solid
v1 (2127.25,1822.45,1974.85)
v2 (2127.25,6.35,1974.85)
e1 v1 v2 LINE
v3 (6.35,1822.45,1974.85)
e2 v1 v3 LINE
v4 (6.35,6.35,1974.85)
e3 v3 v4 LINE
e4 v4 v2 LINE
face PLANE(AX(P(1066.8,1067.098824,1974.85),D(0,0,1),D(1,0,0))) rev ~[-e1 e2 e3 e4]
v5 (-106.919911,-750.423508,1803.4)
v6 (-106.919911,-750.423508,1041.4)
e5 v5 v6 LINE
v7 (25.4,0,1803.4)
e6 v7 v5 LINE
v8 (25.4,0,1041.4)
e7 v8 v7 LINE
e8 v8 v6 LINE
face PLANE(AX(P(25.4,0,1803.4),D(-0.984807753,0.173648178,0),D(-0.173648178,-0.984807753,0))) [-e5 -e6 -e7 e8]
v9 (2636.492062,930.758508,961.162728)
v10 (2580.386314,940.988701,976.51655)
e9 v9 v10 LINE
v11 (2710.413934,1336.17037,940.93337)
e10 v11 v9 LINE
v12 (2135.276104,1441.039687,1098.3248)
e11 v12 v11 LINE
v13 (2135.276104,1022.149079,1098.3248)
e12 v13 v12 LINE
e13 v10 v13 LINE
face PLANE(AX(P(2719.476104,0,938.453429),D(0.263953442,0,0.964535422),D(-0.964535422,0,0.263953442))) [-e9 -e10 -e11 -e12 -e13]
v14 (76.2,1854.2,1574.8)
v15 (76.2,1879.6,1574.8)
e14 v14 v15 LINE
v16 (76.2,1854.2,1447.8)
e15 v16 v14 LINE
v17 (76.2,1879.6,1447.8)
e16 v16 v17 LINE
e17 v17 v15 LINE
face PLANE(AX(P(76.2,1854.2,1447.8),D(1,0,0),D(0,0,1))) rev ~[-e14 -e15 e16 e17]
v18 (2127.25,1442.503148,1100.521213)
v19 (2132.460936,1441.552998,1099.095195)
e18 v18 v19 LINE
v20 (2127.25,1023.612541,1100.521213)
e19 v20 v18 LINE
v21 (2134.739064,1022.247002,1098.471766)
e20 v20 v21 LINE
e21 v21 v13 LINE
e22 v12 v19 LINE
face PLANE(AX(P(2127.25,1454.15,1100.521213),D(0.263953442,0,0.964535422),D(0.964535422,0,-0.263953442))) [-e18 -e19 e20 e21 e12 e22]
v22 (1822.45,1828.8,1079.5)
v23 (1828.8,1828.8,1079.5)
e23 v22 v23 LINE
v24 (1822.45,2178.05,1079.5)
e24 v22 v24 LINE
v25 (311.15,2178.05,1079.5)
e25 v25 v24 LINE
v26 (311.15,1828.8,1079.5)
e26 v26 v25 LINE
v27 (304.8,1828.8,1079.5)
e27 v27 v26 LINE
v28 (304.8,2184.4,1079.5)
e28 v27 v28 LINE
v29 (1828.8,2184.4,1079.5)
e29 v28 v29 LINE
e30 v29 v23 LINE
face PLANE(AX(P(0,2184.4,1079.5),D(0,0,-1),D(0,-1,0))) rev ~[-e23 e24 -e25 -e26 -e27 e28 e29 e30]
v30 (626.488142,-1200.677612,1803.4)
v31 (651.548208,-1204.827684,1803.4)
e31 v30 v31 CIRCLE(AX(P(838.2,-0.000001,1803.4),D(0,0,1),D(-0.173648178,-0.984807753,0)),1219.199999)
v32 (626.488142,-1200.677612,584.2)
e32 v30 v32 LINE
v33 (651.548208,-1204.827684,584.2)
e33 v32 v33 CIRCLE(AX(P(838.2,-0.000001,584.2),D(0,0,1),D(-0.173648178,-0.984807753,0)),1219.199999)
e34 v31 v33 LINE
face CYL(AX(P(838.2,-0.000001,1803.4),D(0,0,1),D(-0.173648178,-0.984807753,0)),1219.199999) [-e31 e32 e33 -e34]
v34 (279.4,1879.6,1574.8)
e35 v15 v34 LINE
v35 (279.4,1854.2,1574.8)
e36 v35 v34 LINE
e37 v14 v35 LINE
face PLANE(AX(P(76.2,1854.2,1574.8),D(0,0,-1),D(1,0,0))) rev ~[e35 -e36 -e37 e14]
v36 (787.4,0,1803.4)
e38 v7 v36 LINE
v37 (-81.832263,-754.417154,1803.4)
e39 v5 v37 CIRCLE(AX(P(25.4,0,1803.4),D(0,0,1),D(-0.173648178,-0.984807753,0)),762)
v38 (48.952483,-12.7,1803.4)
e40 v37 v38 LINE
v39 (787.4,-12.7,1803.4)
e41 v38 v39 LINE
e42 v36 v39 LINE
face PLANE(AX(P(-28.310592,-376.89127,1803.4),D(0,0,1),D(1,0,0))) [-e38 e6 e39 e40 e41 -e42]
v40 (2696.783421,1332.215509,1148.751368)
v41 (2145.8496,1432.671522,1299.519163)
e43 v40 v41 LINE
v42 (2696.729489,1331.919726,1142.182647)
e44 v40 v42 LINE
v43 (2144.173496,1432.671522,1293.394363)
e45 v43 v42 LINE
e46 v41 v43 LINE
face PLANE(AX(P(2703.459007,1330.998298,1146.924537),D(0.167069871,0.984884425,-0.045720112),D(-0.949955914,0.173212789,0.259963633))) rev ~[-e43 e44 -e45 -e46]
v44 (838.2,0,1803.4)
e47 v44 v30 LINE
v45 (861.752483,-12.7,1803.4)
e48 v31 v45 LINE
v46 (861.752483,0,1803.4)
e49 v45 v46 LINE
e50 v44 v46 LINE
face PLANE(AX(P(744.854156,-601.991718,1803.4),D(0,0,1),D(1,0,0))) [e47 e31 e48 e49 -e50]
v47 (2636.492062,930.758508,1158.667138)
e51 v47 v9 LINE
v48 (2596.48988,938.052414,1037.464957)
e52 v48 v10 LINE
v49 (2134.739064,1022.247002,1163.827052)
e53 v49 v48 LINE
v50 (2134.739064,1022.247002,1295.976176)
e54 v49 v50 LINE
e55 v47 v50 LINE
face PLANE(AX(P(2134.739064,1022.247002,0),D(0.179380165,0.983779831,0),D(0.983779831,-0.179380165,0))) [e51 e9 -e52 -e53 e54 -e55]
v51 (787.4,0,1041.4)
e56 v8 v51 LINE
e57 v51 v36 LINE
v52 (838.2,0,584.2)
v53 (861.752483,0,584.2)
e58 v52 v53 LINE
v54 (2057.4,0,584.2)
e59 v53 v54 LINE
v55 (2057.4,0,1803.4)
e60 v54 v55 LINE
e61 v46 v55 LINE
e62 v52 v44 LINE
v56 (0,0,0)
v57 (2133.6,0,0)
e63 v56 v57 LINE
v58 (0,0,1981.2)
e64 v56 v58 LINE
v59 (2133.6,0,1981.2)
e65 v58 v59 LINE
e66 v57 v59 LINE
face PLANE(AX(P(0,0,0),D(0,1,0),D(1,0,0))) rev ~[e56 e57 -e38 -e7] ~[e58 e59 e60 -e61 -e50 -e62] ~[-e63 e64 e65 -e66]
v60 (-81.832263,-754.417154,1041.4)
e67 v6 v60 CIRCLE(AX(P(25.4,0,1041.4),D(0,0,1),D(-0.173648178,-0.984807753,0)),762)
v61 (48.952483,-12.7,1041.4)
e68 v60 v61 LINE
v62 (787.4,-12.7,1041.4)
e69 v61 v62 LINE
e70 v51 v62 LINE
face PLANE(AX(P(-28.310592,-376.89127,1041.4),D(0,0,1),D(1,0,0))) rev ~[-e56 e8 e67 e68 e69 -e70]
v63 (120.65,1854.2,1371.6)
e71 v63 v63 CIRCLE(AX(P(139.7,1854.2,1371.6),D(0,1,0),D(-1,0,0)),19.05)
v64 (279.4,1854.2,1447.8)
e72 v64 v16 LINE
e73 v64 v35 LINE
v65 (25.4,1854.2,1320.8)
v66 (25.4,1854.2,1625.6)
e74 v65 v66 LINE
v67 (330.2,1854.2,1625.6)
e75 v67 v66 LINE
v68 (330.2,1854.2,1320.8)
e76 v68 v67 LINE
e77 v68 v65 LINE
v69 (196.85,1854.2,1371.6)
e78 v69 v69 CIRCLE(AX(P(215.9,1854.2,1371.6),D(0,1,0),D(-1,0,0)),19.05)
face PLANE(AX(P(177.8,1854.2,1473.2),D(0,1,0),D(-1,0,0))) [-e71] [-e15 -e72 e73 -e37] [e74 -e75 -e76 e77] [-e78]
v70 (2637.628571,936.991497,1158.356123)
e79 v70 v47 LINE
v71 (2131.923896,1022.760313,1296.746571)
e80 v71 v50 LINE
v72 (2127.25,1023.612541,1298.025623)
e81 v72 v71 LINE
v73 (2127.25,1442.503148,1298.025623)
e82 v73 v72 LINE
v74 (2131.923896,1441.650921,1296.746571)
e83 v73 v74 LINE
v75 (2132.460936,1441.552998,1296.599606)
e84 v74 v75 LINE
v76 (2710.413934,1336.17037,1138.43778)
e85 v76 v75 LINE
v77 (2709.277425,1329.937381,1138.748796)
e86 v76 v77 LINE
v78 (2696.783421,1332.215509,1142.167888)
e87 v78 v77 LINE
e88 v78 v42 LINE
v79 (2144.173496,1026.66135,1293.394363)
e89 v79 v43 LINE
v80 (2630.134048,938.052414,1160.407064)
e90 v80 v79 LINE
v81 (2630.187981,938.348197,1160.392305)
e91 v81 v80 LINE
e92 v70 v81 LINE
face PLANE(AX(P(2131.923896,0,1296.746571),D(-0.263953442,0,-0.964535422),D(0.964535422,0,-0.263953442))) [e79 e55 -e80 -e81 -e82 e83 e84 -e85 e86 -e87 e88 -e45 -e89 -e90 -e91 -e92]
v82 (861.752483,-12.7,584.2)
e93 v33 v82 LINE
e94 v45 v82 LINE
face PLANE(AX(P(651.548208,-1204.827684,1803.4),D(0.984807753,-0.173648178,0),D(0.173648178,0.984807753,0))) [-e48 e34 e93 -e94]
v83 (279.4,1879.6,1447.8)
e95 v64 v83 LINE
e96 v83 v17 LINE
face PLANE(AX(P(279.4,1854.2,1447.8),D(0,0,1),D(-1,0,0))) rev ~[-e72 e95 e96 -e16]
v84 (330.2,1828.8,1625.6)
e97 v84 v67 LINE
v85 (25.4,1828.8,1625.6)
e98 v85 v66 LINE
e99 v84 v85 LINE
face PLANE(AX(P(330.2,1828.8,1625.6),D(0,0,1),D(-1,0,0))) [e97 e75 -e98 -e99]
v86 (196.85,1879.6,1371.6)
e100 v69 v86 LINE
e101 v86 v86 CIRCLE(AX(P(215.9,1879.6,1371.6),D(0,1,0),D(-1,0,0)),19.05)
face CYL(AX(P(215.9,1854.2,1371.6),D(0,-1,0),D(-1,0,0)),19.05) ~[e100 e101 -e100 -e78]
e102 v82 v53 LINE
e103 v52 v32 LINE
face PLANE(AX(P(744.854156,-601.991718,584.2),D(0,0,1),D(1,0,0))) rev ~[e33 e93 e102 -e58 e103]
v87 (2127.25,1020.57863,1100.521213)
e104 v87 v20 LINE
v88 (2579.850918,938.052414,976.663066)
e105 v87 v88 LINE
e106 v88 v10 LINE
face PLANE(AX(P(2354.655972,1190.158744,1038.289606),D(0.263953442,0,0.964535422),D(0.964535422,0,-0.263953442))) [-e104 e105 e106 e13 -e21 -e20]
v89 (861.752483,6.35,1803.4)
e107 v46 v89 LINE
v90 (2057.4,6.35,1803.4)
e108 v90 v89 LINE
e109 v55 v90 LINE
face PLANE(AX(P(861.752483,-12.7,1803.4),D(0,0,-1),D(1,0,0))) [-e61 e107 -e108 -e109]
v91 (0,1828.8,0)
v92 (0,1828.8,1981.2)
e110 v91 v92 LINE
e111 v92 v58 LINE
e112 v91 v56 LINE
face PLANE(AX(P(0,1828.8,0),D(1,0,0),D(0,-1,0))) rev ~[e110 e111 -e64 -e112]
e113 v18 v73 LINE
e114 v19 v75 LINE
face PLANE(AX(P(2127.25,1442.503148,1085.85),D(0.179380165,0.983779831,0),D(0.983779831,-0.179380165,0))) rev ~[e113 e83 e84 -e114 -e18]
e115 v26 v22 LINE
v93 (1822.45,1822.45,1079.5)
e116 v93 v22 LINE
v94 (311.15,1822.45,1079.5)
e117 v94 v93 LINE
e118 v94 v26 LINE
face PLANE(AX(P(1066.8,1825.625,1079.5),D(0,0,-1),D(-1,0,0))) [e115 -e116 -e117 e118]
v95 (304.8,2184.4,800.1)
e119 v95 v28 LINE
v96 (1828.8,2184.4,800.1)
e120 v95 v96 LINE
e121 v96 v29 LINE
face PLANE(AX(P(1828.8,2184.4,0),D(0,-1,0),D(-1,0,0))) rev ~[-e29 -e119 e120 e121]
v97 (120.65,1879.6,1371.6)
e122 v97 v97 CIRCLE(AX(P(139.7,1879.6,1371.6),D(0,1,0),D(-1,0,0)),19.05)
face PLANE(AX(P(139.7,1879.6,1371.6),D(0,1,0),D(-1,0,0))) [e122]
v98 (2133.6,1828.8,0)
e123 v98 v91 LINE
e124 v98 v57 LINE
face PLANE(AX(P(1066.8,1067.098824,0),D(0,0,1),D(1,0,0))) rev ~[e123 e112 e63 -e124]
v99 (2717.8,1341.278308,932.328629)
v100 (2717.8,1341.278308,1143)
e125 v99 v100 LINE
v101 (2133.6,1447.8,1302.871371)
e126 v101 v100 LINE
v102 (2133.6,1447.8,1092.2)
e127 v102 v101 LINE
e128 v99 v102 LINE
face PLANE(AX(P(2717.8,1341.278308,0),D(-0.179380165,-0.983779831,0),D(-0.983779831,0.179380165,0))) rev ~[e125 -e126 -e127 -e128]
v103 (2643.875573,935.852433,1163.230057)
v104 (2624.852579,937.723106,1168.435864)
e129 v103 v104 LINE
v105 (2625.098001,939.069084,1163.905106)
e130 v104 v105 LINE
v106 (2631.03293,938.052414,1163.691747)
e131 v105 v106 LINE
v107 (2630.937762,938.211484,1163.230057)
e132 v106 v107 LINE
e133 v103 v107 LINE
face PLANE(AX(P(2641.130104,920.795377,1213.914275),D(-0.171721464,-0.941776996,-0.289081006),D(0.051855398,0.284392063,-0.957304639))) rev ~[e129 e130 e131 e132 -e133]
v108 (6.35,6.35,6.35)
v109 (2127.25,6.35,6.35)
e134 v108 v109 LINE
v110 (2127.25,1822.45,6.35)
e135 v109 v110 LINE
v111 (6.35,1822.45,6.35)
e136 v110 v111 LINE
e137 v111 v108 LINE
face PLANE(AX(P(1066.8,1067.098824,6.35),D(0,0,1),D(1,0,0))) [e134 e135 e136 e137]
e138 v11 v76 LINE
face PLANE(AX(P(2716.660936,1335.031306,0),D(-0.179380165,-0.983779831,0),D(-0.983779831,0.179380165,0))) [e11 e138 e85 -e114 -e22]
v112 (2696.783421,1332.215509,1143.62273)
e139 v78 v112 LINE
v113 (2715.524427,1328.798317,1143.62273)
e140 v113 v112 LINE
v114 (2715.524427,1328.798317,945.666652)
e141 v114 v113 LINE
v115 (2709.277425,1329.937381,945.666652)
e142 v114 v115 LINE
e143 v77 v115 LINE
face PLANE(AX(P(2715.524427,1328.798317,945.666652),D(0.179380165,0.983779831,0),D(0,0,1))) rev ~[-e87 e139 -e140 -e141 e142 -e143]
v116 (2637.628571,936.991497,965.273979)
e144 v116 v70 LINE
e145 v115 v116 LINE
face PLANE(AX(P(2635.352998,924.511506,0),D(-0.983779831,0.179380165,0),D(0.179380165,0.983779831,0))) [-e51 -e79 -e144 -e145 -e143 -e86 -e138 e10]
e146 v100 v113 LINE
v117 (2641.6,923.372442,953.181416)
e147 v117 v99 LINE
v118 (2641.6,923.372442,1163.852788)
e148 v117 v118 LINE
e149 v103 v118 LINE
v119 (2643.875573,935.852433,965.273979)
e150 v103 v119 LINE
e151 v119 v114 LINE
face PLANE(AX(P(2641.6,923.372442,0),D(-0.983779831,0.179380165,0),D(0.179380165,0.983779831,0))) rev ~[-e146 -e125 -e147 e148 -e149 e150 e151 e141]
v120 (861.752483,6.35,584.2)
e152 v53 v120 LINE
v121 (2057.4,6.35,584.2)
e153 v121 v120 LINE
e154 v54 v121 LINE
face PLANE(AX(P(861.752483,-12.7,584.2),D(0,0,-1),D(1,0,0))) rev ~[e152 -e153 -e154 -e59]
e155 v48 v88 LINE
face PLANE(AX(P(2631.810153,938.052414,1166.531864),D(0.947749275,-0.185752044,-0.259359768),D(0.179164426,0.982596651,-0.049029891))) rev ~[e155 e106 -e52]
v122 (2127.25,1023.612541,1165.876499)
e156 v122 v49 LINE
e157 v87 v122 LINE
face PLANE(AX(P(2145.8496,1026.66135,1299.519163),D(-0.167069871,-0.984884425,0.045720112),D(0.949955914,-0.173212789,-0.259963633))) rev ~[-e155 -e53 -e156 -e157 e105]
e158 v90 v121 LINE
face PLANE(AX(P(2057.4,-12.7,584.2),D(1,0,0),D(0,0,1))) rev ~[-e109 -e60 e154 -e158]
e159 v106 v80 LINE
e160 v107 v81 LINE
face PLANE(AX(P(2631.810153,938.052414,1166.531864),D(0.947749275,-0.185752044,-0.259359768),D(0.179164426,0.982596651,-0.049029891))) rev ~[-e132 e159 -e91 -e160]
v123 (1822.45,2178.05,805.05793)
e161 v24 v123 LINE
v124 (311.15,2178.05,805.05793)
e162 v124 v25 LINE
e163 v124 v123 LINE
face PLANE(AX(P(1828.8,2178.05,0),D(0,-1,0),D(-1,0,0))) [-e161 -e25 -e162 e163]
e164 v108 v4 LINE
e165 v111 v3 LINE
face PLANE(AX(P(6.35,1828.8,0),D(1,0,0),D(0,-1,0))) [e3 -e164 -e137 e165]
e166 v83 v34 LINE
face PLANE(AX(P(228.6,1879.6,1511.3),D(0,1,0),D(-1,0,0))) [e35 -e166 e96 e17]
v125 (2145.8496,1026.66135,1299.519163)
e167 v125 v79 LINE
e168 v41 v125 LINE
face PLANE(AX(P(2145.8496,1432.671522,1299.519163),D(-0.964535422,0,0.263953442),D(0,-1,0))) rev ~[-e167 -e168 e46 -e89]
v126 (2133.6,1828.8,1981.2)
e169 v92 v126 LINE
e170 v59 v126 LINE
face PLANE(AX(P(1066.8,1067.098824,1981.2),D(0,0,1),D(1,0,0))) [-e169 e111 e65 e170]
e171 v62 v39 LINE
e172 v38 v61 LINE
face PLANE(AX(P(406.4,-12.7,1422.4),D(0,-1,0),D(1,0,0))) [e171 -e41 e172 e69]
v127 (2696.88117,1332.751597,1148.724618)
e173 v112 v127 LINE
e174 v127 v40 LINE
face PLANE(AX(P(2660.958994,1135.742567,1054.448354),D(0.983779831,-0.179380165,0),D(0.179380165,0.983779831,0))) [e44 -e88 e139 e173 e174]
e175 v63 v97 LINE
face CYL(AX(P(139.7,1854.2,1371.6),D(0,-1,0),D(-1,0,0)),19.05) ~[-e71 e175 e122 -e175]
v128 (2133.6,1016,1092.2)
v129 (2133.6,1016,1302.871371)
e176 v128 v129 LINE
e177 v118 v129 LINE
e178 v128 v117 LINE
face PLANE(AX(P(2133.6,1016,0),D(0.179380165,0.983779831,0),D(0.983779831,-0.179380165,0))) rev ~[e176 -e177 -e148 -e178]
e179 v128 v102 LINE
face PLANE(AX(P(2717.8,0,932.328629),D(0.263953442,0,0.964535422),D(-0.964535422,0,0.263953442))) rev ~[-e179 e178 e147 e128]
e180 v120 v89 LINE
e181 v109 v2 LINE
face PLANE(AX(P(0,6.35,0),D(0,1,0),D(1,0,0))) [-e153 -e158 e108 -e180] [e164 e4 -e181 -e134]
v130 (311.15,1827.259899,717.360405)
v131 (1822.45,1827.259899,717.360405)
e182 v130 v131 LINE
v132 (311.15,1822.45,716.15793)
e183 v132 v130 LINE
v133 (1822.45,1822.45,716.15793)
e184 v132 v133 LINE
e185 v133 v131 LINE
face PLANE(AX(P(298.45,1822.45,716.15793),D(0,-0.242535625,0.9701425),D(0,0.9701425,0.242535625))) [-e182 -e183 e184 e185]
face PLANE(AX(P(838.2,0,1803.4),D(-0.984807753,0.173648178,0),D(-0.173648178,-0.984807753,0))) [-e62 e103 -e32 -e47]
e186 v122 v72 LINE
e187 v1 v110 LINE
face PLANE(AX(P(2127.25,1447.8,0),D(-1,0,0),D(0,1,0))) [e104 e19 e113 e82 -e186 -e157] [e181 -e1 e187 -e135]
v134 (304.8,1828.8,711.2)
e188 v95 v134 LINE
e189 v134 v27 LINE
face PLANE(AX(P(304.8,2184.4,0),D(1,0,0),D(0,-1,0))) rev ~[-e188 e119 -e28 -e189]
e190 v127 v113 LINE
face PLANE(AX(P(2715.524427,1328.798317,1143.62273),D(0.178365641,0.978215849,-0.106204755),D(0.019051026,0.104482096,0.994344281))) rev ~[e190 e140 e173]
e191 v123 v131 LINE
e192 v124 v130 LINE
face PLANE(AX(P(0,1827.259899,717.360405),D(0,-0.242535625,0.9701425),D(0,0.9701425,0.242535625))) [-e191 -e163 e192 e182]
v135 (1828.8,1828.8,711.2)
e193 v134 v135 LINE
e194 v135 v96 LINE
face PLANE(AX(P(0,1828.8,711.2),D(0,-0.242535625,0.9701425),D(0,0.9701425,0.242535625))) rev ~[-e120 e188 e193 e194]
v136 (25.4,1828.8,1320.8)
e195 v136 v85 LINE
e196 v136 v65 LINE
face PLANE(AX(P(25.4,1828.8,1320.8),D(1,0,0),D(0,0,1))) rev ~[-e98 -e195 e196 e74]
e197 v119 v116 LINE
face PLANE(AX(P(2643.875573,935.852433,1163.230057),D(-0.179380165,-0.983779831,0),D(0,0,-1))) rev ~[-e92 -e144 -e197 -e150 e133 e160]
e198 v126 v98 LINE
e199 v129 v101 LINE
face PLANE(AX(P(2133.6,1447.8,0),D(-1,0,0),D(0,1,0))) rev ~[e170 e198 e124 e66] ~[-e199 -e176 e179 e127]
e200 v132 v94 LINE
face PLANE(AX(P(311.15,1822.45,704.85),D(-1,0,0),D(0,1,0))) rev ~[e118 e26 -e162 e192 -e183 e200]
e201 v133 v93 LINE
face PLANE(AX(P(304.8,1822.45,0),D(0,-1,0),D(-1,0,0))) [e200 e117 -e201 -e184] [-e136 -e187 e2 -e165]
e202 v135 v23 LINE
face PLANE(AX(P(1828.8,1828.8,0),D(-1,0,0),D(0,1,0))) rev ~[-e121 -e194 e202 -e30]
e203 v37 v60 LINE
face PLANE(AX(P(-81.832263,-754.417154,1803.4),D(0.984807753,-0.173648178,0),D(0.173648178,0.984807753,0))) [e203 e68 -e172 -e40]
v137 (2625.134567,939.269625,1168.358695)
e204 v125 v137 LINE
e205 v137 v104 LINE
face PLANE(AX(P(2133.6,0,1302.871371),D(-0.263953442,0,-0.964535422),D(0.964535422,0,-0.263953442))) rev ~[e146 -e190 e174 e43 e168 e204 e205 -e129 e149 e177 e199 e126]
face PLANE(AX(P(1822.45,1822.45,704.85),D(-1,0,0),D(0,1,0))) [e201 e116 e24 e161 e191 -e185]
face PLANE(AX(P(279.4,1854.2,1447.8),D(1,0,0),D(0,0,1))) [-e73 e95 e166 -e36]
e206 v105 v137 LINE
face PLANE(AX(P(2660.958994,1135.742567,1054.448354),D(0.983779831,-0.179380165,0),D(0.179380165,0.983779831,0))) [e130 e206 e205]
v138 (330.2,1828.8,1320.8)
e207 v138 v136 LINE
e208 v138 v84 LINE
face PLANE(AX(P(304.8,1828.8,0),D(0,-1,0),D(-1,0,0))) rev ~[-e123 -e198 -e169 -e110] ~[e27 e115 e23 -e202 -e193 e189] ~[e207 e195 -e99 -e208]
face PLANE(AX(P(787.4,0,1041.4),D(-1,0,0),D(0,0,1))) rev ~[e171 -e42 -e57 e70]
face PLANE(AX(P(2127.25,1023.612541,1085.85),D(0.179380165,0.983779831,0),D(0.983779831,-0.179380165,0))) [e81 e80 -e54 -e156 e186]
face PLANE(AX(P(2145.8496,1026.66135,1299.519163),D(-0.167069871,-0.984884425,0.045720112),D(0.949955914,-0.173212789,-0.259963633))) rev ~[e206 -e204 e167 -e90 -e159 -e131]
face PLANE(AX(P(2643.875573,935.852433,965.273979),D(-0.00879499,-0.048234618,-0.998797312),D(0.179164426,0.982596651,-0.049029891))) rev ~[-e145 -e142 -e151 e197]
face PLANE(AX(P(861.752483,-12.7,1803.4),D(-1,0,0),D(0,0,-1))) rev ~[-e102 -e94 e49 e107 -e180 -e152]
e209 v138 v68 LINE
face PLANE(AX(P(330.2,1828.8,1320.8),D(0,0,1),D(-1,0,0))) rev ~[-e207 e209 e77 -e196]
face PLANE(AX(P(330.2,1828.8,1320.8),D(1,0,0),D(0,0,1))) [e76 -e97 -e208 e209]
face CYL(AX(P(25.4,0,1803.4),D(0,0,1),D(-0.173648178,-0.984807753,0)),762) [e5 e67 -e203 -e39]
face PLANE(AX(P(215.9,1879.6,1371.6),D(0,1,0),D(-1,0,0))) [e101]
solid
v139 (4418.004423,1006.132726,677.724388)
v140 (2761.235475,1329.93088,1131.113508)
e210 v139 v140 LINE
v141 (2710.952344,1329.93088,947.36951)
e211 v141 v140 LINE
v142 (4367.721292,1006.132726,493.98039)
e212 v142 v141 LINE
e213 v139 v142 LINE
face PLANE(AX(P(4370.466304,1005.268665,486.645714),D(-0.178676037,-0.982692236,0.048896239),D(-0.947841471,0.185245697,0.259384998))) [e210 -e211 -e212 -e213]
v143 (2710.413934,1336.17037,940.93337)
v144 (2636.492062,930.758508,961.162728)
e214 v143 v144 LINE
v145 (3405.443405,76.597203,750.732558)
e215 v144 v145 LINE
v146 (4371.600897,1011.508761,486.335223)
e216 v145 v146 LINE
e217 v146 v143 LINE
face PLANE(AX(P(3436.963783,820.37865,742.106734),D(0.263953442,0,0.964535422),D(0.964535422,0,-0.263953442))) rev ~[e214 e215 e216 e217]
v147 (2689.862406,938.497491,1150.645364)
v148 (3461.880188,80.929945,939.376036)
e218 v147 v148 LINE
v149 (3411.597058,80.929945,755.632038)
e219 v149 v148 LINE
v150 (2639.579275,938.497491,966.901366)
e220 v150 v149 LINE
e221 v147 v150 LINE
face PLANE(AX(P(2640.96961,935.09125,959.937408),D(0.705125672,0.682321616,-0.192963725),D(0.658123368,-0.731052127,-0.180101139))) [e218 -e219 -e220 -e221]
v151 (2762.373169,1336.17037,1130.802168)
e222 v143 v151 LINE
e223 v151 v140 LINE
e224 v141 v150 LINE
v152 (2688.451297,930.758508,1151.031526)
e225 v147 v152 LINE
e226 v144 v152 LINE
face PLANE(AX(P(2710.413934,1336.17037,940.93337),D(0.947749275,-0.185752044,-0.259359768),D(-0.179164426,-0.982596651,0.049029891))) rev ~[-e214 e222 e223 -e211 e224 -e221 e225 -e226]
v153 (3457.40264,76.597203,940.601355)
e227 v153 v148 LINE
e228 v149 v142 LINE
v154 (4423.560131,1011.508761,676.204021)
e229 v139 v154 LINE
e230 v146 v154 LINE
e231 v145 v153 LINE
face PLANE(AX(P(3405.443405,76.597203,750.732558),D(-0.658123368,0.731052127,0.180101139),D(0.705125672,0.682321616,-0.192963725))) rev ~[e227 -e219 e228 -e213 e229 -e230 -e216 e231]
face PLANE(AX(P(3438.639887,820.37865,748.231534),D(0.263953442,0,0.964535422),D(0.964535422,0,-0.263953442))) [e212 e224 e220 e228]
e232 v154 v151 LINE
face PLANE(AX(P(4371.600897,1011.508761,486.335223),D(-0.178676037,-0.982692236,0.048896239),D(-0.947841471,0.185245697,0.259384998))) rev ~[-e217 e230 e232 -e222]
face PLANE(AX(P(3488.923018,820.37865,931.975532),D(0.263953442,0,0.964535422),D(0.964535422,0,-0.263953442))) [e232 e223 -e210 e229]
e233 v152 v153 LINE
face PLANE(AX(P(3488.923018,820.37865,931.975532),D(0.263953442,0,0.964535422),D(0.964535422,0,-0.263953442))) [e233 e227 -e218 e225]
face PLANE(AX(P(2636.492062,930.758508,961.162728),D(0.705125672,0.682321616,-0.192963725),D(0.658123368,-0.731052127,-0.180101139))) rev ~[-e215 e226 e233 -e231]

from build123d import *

# Parameters (mm, degrees)
F1_DEPTH    = 1981.2
F3_DEPTH    = 2184.401
F4_W        = 355.6
F4_H        = 901.7
F5_DEPTH    = 2717.801
F6_T        = 6.35
F6_T3_DEPTH = 381
F6_T5_DEPTH = 1536.7
F6_T7_DEPTH = 223.3713712335
F6_T9_DEPTH = 444.5
F8_DEPTH    = 196.85
F10_DEPTH   = 19.05
F11_W       = 762
F11_H       = 762
F11_W_2     = 1219.2
F11_H_2     = 1219.2
F12_DEPTH   = 12.7
F14_DEPTH   = 1219.2
F15_DEPTH   = 25.4
F17_DEPTH   = 762
F18_W       = 304.8
F18_H       = 304.8
F19_DEPTH   = 25.4
F20_W       = 101.6
F20_H       = 127
F20_R       = 19.05
F21_DEPTH   = 25.4
F23_DEPTH   = 196.85
F24_T       = -6.35


# Not quite as in the source:
# - a shell that OpenCascade refuses in one call is made with other operations: the cavity is built on its own and cut out


with BuildPart() as f1:
    # F0 (on Top) → F1 (new body)
    with BuildSketch(Plane.XY):
        Polygon((304.8, 1828.8), (0, 1828.8), (0, 0), (2133.6, 0), (2133.6, 1016), (2133.6, 1447.8), (2133.6, 1828.8), (1828.8, 1828.8), (1828.8, 2184.4), (304.8, 2184.4), align=None)
        Polygon((2133.6, 1447.8), (2133.6, 1016), (2641.6, 923.3724416764), (2717.8, 1341.2783079278), align=None)
    extrude(amount=F1_DEPTH)

    # F2 (on Front) → F3 (cut, through all)
    with BuildSketch(Plane.XZ):
        Polygon((2717.8, 1981.2), (2133.6, 1981.2), (2133.6, 1302.8713712335), (2717.8, 1143), align=None)
        Polygon((2133.6, 1092.2), (2133.6, 0), (2717.8, 0), (2717.8, 932.3286287665), align=None)
    extrude(amount=-F3_DEPTH, mode=Mode.SUBTRACT)

    # F4 (on face) → F5 (cut, through all)
    with BuildSketch(Plane(origin=(0, 0, 0), x_dir=(0, -1, 0), z_dir=(-1, 0, 0))):
        with Locations((-2006.6, 1530.35)):
            Rectangle(F4_W, F4_H)
        Polygon((-2184.4, 0), (-1828.8, 0), (-1828.8, 711.2), (-2184.4, 800.1), align=None)
    extrude(amount=-F5_DEPTH, mode=Mode.SUBTRACT)

    # F6: shell of thickness 6.35, made by hand


with BuildPart() as f6_core1:
    # F6_t2: copy of F1
    add(f1.part)

    # the walls: a layer under each face that stays
    f6_faces = [f6_core1.faces().sort_by_distance(p)[0] for p in [
        (1778, 1828.8, 1651),
        (1066.8, 2006.6, 755.65),
        (1066.8, 2184.4, 939.8),
        (1828.8, 2006.6, 895.35),
        (304.8, 2006.6, 895.35),
        (0, 914.4, 990.6),
        (1066.8, 0, 990.6),
        (1066.8, 914.4, 1981.2),
        (2133.6, 914.4, 990.6),
        (2425.7, 1185.5862208382, 1012.2643143833),
        (2679.7, 1132.3253748021, 1048.0907081594),
        (2387.6, 969.6862208382, 1128.0263937761),
        (2425.7, 1185.5862208382, 1222.9356856167),
        (2425.7, 1394.5391539639, 1117.6),
        (1066.8, 914.4, 0),
    ]]
    thicken(f6_faces, amount=-F6_T, mode=Mode.SUBTRACT)

    # F6_s4 → F6_t3 (cut)
    with BuildSketch(Plane.XY.offset(704.85)):
        Polygon((304.7365, 1828.8635), (304.8, 1822.45), (311.15, 1822.45), (311.15, 1828.8), align=None)
        Polygon((1828.8635, 1828.8635), (1828.8, 1822.45), (1822.45, 1822.45), (1822.45, 1828.8), align=None)
    extrude(amount=F6_T3_DEPTH, mode=Mode.SUBTRACT)

    # F6_s6 → F6_t5 (cut)
    with BuildSketch(Plane.YZ.offset(298.45)):
        Polygon((1828.8789010122, 711.1383959512), (1822.45, 711.2), (1822.45, 716.1579301807), (1827.259898781, 717.3604048759), align=None)
    extrude(amount=F6_T5_DEPTH, mode=Mode.SUBTRACT)

    # F6_s8 → F6_t7 (cut)
    with BuildSketch(Plane.XY.offset(1085.85)):
        Polygon((2133.6748906405, 1447.8624700193), (2127.25, 1447.8), (2127.25, 1442.5031482168), (2132.4609359537, 1441.5529980712), align=None)
        Polygon((2133.6521093595, 1015.9375299807), (2127.25, 1016), (2127.25, 1023.6125407413), (2134.7390640463, 1022.2470019288), align=None)
    extrude(amount=F6_T7_DEPTH, mode=Mode.SUBTRACT)

    # F6_s10 → F6_t9 (cut)
    with BuildSketch(Plane.XZ.offset(-1454.15)):
        Polygon((2133.6802610435, 1302.9326192328), (2127.25, 1302.8713712335), (2127.25, 1298.0256231785), (2131.9238956462, 1296.7465713025), align=None)
        Polygon((2133.6467389565, 1092.1387520007), (2127.25, 1092.2), (2127.25, 1100.5212126471), (2135.2761043538, 1098.324799931), align=None)
    extrude(amount=F6_T9_DEPTH, mode=Mode.SUBTRACT)


with BuildPart() as f1_1:
    add(f1.part)

    # what is left inside the walls is the cavity
    f6_cavity = [f6_core1.part.solids().sort_by_distance(p)[0] for p in [
        (1066.8, 6.4135, 1318.683333),
    ]]
    add(f6_cavity, mode=Mode.SUBTRACT)

    # F7 (on face) → F8 (cut)
    with BuildSketch(Plane(origin=(480.3521470905, 0, 1755.2969125438), x_dir=(0.9645354222, 0, -0.2639534415), z_dir=(0.2639534415, 0, 0.9645354222))):
        Polygon((1726.7353944944, 1026.6613500194), (2230.5640168439, 938.0524140666), (2304.8472958363, 1330.9982978041), (1726.7353944944, 1432.6715219268), align=None)
    extrude(amount=-F8_DEPTH, mode=Mode.SUBTRACT)

    # F9 (on face) → F10 (cut)
    with BuildSketch(Plane(origin=(2393.6525155954, -436.4531259741, 0), x_dir=(0.1793801648, 0.9837798313, 0), z_dir=(0.9837798313, -0.1793801648, 0))):
        Polygon((1794.3562029508, 945.6666515071), (1794.3562029508, 1143.6227302064), (1394.9315845226, 1163.2300573458), (1394.9315845226, 965.2739786465), align=None)
        Polygon((1394.9315845226, 1163.2300573458), (1794.3562029508, 1143.6227302064), (1798.9468574524, 1186.6028308868), (1379.6262741089, 1213.9142751694), align=None)
    extrude(amount=-F10_DEPTH, mode=Mode.SUBTRACT)

    # F11 (on face) → F12 (join)
    with BuildSketch(Plane.XZ):
        with Locations((406.4, 1422.4)):
            Rectangle(F11_W, F11_H)
        with Locations((1447.8, 1193.8)):
            Rectangle(F11_W_2, F11_H_2)
    extrude(amount=F12_DEPTH)

    # F13 (on face) → F14 (join, through all)
    with BuildSketch(Plane.XY.offset(1803.4)):
        with BuildLine():
            Line((838.2, 0), (626.4881417885, -1200.6776124725))
            ThreePointArc((626.4881417885, -1200.6776124725), (639.0073665936, -1202.8179142317), (651.548208115, -1204.8276841881))
            Line((651.548208115, -1204.8276841881), (861.7524832869, -12.7))
            Line((861.7524832869, -12.7), (838.2, -12.7))
            Line((838.2, -12.7), (838.2, 0))
        make_face()
    extrude(amount=-F14_DEPTH)

    # F15 (cut): a face of the model
    f15_faces = [f1_1.faces().sort_by_distance(p)[0] for p in [
        (1459.5762416435, -12.7, 1193.8),
    ]]
    extrude(f15_faces, amount=-F15_DEPTH, mode=Mode.SUBTRACT)

    # F16 (on face) → F17 (join, through all)
    with BuildSketch(Plane.XY.offset(1803.4)):
        with BuildLine():
            Line((25.4, 0), (-106.9199113822, -750.4235077953))
            ThreePointArc((-106.9199113822, -750.4235077953), (-94.3927308322, -752.524884399), (-81.8322629627, -754.4171536888))
            Line((-81.8322629627, -754.4171536888), (48.9524832869, -12.7))
            Line((48.9524832869, -12.7), (25.4, -12.7))
            Line((25.4, -12.7), (25.4, 0))
        make_face()
    extrude(amount=-F17_DEPTH)

    # F18 (on face) → F19 (join)
    with BuildSketch(Plane(origin=(0, 1828.8, 0), x_dir=(-1, 0, 0), z_dir=(0, 1, 0))):
        with Locations((-177.8, 1473.2)):
            Rectangle(F18_W, F18_H)
    extrude(amount=F19_DEPTH)

    # F20 (on face) → F21 (join)
    with BuildSketch(Plane(origin=(0, 1854.2, 0), x_dir=(-1, 0, 0), z_dir=(0, 1, 0))):
        with Locations((-228.6, 1511.3)):
            Rectangle(F20_W, F20_H)
        with Locations((-127, 1511.3)):
            Rectangle(F20_W, F20_H)
        with Locations((-215.9, 1371.6)):
            Circle(F20_R)
        with Locations((-139.7, 1371.6)):
            Circle(F20_R)
    extrude(amount=F21_DEPTH)


with BuildPart() as f23:
    # F22 (on face) → F23 (new body, through all)
    with BuildSketch(Plane(origin=(428.392912122, 0, 1565.428114682), x_dir=(0.9645354222, 0, -0.2639534415), z_dir=(0.2639534415, 0, 0.9645354222))):
        Polygon((2365.9276469879, 1336.1703700453), (2289.2877743556, 930.7585076514), (3086.5123505597, 76.5972025713), (4088.1940606272, 1011.5087609039), align=None)
    extrude(amount=F23_DEPTH)

    # F24
    f24_openings = [f23.faces().sort_by_distance(p)[0] for p in [
        (3451.053503, 803.590618, 942.338851),
        (3914.501768, 544.052982, 713.468289),
        (2699.432616, 1133.464439, 1045.982448),
    ]]
    offset(amount=F24_T, openings=f24_openings)


solid = Compound([f1_1.part, f23.part])
